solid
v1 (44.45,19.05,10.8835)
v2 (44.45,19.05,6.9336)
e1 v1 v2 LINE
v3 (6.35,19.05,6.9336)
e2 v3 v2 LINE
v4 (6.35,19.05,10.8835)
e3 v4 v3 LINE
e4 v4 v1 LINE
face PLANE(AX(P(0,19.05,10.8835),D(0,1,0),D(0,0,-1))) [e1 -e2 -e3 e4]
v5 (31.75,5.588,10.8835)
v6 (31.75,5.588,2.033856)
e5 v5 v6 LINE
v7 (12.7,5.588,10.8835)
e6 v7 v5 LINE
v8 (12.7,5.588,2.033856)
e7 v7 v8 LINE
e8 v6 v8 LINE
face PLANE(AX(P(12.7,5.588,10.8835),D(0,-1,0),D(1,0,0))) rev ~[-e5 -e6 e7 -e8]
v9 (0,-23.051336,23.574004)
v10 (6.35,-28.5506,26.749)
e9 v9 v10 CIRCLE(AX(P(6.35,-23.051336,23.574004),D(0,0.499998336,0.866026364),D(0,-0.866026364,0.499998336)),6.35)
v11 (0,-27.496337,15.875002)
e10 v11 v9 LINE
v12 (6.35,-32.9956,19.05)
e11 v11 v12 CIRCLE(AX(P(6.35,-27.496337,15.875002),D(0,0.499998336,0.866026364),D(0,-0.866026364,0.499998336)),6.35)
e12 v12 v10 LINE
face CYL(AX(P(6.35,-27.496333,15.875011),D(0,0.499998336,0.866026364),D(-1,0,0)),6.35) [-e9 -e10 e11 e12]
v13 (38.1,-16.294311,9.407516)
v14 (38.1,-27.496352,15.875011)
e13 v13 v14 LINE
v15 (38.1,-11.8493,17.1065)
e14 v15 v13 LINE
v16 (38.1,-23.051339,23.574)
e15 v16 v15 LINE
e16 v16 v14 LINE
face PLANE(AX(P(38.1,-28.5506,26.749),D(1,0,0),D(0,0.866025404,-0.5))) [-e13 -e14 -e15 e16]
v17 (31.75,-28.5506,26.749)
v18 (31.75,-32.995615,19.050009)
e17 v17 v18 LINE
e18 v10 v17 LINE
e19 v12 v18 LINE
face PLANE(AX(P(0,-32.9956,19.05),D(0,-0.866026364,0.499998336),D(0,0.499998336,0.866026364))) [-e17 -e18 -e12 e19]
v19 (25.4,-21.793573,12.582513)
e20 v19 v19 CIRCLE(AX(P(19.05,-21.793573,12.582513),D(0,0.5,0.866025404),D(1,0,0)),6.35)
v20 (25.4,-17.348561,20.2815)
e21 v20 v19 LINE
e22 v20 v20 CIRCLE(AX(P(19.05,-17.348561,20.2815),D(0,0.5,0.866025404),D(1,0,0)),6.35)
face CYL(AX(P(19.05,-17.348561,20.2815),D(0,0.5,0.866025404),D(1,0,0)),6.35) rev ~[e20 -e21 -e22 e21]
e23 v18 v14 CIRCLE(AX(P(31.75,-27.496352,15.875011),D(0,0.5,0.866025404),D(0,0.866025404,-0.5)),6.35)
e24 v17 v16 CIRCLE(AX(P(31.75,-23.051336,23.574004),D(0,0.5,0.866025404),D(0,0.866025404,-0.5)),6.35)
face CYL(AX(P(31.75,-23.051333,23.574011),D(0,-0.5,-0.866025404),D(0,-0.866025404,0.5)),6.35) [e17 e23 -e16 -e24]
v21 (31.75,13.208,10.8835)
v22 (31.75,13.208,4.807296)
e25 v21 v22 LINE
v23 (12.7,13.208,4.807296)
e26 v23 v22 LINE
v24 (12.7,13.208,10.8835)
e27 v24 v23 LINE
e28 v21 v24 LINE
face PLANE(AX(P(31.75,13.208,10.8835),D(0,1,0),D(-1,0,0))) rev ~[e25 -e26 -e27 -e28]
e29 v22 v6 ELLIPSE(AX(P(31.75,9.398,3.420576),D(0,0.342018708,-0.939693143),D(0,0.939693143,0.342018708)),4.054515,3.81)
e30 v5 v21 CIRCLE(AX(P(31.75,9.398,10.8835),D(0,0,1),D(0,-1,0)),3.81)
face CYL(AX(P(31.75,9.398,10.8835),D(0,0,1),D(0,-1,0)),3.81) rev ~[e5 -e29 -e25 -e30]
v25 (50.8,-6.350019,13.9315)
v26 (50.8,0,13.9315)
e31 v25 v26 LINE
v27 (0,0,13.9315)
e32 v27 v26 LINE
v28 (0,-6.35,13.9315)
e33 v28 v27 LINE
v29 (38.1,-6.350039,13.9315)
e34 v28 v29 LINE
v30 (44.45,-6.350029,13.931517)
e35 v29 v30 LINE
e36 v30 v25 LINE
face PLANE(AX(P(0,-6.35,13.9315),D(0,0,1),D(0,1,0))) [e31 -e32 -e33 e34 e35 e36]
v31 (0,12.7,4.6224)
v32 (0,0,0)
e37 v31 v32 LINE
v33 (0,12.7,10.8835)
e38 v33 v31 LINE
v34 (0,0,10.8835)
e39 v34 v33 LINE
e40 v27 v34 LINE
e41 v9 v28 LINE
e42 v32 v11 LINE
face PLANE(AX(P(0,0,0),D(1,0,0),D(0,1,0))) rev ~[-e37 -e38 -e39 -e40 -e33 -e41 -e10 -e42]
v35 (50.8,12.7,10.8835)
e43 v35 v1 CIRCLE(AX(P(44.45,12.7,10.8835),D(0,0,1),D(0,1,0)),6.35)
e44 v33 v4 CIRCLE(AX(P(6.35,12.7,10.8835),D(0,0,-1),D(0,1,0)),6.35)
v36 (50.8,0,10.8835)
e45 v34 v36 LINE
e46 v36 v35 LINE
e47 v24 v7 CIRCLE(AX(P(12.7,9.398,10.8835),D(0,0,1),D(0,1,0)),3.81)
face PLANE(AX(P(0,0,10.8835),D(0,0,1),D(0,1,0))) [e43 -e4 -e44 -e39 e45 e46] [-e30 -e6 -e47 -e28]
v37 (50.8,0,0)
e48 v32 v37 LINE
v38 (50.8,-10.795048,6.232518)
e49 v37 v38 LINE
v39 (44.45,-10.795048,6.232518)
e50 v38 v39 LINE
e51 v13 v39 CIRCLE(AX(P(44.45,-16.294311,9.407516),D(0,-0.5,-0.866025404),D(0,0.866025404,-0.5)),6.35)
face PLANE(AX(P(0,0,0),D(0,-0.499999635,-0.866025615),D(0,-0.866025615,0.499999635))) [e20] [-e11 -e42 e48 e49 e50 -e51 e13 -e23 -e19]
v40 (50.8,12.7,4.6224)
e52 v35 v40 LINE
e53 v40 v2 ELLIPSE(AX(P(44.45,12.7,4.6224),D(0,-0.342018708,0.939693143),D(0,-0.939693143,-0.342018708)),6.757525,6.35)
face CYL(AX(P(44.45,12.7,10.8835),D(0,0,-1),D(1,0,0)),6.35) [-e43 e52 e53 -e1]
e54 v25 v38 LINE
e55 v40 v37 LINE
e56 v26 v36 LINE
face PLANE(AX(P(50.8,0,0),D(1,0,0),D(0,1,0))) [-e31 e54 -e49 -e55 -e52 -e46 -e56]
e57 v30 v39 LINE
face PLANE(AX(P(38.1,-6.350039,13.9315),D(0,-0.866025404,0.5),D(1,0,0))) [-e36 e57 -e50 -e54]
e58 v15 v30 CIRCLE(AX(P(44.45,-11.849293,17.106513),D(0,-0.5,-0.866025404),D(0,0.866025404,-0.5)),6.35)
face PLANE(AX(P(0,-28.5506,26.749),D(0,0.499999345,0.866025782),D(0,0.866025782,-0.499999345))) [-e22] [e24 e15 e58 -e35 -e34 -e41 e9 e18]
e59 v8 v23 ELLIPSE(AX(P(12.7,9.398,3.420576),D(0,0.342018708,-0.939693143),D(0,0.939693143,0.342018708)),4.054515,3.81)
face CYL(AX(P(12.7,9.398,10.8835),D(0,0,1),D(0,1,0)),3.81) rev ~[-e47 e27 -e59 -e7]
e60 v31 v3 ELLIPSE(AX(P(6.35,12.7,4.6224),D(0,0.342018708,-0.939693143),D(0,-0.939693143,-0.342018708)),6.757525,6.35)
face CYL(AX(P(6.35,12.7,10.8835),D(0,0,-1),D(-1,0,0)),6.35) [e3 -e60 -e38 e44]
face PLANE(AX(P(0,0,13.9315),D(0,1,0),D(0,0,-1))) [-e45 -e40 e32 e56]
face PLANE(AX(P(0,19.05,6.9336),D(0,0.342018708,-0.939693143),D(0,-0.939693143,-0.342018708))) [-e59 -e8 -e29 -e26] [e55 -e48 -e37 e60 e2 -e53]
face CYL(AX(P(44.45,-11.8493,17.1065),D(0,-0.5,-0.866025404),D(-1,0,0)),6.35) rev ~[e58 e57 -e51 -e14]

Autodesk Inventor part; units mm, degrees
ref_plane "YZ Plane" through (0, 0, 0) normal (1, 0, 0) x (0, 1, 0)
ref_plane "XZ Plane" through (0, 0, 0) normal (0, 1, 0) x (-1, 0, 0)
ref_plane "XY Plane" through (0, 0, 0) normal (0, 0, 1) x (1, 0, 0)
sketch "Sketch1" plane through (0, 0, 0) normal (1, 0, 0) x (0, 1, 0)
  line L0 (0, 0) -> (-32.9956, 19.05)
  line L1 (-32.9956, 19.05) -> (-28.5506, 26.749)
  line L2 (-28.5506, 26.749) -> (-6.35, 13.9315)
  line L3 (-6.35, 13.9315) -> (0, 13.9315)
  line L4 (0, 13.9315) -> (0, 10.8835)
  line L5 (0, 10.8835) -> (19.05, 10.8835)
  line L6 (19.05, 10.8835) -> (19.05, 6.9336)
  line L7 (19.05, 6.9336) -> (0, 0)
  dimension "d0" = 38.1
  dimension "d1" = 8.89
  dimension "d2" = 30
  dimension "d3" = 19.05
  dimension "d5" = 3.048
  dimension "d6" = 20
  dimension "d7" = 6.35
extrude "MAIN BODY" add sketch "Sketch1" along normal blind 50.8
sketch "Sketch2" plane through (0, 0, 10.8835) normal (0, 0, 1) x (1, 0, 0)
  line L0 (12.7, 9.398) -> (31.75, 9.398) construction
  line L1 (12.7, 5.588) -> (31.75, 5.588)
  line L2 (31.75, 13.208) -> (12.7, 13.208)
  arc A0 (12.7, 13.208) -> (12.7, 5.588) centre (12.7, 9.398) ccw
  arc A1 (31.75, 5.588) -> (31.75, 13.208) centre (31.75, 9.398) ccw
  line L3 (0, 19.05) -> (0, 0) projected
  line L4 (0, 19.05) -> (50.8, 19.05) projected
  line L5 (0, 0) -> (50.8, 0) projected
  point P0 (22.225, 9.398)
  dimension "d11" = 7.62
  dimension "d12" = 19.05
  dimension "d13" = 12.7
  dimension "d15" = 9.398
extrude "SLOT CUTOUT" cut sketch "Sketch2" against normal through all
sketch "Sketch3" plane through (0, -28.5506, 26.749) normal (0, 0.5, 0.8660254) x (1, 0, 0)
  circle A0 centre (19.05, 12.935) radius 6.35
  line L0 (38.1, 25.635) -> (50.8, 25.635)
  line L1 (50.8, 25.635) -> (50.8, 0)
  line L2 (50.8, 0) -> (38.1, 0)
  line L3 (38.1, 0) -> (38.1, 25.635)
  line L4 (0, 25.635) -> (0, 0) projected
  line L5 (0, 25.635) -> (50.8, 25.635) projected
  line L6 (50.8, 25.635) -> (50.8, 0) projected
  line L7 (0, 0) -> (50.8, 0) projected
  point P0 (0, 38.1)
  dimension "d18" = 12.7
  dimension "d19" = 19.05
  dimension "d20" = 12.7
  dimension "d21" = 38.1
extrude "CIRC AND RECT CUTOUT" cut sketch "Sketch3" against normal through all contours A0 | L0 L1 L2 L3
fillet ".25 filliets" radius 6.35 5 edges at (50.8, 19.05, 8.9085) (0, 19.05, 8.9085) (38.1, -8.5725, 10.082) (38.1, -30.7731, 22.8995) (0, -30.7731, 22.8995)
properties part number "ANS9-2-BK" material "Polypropylene"
